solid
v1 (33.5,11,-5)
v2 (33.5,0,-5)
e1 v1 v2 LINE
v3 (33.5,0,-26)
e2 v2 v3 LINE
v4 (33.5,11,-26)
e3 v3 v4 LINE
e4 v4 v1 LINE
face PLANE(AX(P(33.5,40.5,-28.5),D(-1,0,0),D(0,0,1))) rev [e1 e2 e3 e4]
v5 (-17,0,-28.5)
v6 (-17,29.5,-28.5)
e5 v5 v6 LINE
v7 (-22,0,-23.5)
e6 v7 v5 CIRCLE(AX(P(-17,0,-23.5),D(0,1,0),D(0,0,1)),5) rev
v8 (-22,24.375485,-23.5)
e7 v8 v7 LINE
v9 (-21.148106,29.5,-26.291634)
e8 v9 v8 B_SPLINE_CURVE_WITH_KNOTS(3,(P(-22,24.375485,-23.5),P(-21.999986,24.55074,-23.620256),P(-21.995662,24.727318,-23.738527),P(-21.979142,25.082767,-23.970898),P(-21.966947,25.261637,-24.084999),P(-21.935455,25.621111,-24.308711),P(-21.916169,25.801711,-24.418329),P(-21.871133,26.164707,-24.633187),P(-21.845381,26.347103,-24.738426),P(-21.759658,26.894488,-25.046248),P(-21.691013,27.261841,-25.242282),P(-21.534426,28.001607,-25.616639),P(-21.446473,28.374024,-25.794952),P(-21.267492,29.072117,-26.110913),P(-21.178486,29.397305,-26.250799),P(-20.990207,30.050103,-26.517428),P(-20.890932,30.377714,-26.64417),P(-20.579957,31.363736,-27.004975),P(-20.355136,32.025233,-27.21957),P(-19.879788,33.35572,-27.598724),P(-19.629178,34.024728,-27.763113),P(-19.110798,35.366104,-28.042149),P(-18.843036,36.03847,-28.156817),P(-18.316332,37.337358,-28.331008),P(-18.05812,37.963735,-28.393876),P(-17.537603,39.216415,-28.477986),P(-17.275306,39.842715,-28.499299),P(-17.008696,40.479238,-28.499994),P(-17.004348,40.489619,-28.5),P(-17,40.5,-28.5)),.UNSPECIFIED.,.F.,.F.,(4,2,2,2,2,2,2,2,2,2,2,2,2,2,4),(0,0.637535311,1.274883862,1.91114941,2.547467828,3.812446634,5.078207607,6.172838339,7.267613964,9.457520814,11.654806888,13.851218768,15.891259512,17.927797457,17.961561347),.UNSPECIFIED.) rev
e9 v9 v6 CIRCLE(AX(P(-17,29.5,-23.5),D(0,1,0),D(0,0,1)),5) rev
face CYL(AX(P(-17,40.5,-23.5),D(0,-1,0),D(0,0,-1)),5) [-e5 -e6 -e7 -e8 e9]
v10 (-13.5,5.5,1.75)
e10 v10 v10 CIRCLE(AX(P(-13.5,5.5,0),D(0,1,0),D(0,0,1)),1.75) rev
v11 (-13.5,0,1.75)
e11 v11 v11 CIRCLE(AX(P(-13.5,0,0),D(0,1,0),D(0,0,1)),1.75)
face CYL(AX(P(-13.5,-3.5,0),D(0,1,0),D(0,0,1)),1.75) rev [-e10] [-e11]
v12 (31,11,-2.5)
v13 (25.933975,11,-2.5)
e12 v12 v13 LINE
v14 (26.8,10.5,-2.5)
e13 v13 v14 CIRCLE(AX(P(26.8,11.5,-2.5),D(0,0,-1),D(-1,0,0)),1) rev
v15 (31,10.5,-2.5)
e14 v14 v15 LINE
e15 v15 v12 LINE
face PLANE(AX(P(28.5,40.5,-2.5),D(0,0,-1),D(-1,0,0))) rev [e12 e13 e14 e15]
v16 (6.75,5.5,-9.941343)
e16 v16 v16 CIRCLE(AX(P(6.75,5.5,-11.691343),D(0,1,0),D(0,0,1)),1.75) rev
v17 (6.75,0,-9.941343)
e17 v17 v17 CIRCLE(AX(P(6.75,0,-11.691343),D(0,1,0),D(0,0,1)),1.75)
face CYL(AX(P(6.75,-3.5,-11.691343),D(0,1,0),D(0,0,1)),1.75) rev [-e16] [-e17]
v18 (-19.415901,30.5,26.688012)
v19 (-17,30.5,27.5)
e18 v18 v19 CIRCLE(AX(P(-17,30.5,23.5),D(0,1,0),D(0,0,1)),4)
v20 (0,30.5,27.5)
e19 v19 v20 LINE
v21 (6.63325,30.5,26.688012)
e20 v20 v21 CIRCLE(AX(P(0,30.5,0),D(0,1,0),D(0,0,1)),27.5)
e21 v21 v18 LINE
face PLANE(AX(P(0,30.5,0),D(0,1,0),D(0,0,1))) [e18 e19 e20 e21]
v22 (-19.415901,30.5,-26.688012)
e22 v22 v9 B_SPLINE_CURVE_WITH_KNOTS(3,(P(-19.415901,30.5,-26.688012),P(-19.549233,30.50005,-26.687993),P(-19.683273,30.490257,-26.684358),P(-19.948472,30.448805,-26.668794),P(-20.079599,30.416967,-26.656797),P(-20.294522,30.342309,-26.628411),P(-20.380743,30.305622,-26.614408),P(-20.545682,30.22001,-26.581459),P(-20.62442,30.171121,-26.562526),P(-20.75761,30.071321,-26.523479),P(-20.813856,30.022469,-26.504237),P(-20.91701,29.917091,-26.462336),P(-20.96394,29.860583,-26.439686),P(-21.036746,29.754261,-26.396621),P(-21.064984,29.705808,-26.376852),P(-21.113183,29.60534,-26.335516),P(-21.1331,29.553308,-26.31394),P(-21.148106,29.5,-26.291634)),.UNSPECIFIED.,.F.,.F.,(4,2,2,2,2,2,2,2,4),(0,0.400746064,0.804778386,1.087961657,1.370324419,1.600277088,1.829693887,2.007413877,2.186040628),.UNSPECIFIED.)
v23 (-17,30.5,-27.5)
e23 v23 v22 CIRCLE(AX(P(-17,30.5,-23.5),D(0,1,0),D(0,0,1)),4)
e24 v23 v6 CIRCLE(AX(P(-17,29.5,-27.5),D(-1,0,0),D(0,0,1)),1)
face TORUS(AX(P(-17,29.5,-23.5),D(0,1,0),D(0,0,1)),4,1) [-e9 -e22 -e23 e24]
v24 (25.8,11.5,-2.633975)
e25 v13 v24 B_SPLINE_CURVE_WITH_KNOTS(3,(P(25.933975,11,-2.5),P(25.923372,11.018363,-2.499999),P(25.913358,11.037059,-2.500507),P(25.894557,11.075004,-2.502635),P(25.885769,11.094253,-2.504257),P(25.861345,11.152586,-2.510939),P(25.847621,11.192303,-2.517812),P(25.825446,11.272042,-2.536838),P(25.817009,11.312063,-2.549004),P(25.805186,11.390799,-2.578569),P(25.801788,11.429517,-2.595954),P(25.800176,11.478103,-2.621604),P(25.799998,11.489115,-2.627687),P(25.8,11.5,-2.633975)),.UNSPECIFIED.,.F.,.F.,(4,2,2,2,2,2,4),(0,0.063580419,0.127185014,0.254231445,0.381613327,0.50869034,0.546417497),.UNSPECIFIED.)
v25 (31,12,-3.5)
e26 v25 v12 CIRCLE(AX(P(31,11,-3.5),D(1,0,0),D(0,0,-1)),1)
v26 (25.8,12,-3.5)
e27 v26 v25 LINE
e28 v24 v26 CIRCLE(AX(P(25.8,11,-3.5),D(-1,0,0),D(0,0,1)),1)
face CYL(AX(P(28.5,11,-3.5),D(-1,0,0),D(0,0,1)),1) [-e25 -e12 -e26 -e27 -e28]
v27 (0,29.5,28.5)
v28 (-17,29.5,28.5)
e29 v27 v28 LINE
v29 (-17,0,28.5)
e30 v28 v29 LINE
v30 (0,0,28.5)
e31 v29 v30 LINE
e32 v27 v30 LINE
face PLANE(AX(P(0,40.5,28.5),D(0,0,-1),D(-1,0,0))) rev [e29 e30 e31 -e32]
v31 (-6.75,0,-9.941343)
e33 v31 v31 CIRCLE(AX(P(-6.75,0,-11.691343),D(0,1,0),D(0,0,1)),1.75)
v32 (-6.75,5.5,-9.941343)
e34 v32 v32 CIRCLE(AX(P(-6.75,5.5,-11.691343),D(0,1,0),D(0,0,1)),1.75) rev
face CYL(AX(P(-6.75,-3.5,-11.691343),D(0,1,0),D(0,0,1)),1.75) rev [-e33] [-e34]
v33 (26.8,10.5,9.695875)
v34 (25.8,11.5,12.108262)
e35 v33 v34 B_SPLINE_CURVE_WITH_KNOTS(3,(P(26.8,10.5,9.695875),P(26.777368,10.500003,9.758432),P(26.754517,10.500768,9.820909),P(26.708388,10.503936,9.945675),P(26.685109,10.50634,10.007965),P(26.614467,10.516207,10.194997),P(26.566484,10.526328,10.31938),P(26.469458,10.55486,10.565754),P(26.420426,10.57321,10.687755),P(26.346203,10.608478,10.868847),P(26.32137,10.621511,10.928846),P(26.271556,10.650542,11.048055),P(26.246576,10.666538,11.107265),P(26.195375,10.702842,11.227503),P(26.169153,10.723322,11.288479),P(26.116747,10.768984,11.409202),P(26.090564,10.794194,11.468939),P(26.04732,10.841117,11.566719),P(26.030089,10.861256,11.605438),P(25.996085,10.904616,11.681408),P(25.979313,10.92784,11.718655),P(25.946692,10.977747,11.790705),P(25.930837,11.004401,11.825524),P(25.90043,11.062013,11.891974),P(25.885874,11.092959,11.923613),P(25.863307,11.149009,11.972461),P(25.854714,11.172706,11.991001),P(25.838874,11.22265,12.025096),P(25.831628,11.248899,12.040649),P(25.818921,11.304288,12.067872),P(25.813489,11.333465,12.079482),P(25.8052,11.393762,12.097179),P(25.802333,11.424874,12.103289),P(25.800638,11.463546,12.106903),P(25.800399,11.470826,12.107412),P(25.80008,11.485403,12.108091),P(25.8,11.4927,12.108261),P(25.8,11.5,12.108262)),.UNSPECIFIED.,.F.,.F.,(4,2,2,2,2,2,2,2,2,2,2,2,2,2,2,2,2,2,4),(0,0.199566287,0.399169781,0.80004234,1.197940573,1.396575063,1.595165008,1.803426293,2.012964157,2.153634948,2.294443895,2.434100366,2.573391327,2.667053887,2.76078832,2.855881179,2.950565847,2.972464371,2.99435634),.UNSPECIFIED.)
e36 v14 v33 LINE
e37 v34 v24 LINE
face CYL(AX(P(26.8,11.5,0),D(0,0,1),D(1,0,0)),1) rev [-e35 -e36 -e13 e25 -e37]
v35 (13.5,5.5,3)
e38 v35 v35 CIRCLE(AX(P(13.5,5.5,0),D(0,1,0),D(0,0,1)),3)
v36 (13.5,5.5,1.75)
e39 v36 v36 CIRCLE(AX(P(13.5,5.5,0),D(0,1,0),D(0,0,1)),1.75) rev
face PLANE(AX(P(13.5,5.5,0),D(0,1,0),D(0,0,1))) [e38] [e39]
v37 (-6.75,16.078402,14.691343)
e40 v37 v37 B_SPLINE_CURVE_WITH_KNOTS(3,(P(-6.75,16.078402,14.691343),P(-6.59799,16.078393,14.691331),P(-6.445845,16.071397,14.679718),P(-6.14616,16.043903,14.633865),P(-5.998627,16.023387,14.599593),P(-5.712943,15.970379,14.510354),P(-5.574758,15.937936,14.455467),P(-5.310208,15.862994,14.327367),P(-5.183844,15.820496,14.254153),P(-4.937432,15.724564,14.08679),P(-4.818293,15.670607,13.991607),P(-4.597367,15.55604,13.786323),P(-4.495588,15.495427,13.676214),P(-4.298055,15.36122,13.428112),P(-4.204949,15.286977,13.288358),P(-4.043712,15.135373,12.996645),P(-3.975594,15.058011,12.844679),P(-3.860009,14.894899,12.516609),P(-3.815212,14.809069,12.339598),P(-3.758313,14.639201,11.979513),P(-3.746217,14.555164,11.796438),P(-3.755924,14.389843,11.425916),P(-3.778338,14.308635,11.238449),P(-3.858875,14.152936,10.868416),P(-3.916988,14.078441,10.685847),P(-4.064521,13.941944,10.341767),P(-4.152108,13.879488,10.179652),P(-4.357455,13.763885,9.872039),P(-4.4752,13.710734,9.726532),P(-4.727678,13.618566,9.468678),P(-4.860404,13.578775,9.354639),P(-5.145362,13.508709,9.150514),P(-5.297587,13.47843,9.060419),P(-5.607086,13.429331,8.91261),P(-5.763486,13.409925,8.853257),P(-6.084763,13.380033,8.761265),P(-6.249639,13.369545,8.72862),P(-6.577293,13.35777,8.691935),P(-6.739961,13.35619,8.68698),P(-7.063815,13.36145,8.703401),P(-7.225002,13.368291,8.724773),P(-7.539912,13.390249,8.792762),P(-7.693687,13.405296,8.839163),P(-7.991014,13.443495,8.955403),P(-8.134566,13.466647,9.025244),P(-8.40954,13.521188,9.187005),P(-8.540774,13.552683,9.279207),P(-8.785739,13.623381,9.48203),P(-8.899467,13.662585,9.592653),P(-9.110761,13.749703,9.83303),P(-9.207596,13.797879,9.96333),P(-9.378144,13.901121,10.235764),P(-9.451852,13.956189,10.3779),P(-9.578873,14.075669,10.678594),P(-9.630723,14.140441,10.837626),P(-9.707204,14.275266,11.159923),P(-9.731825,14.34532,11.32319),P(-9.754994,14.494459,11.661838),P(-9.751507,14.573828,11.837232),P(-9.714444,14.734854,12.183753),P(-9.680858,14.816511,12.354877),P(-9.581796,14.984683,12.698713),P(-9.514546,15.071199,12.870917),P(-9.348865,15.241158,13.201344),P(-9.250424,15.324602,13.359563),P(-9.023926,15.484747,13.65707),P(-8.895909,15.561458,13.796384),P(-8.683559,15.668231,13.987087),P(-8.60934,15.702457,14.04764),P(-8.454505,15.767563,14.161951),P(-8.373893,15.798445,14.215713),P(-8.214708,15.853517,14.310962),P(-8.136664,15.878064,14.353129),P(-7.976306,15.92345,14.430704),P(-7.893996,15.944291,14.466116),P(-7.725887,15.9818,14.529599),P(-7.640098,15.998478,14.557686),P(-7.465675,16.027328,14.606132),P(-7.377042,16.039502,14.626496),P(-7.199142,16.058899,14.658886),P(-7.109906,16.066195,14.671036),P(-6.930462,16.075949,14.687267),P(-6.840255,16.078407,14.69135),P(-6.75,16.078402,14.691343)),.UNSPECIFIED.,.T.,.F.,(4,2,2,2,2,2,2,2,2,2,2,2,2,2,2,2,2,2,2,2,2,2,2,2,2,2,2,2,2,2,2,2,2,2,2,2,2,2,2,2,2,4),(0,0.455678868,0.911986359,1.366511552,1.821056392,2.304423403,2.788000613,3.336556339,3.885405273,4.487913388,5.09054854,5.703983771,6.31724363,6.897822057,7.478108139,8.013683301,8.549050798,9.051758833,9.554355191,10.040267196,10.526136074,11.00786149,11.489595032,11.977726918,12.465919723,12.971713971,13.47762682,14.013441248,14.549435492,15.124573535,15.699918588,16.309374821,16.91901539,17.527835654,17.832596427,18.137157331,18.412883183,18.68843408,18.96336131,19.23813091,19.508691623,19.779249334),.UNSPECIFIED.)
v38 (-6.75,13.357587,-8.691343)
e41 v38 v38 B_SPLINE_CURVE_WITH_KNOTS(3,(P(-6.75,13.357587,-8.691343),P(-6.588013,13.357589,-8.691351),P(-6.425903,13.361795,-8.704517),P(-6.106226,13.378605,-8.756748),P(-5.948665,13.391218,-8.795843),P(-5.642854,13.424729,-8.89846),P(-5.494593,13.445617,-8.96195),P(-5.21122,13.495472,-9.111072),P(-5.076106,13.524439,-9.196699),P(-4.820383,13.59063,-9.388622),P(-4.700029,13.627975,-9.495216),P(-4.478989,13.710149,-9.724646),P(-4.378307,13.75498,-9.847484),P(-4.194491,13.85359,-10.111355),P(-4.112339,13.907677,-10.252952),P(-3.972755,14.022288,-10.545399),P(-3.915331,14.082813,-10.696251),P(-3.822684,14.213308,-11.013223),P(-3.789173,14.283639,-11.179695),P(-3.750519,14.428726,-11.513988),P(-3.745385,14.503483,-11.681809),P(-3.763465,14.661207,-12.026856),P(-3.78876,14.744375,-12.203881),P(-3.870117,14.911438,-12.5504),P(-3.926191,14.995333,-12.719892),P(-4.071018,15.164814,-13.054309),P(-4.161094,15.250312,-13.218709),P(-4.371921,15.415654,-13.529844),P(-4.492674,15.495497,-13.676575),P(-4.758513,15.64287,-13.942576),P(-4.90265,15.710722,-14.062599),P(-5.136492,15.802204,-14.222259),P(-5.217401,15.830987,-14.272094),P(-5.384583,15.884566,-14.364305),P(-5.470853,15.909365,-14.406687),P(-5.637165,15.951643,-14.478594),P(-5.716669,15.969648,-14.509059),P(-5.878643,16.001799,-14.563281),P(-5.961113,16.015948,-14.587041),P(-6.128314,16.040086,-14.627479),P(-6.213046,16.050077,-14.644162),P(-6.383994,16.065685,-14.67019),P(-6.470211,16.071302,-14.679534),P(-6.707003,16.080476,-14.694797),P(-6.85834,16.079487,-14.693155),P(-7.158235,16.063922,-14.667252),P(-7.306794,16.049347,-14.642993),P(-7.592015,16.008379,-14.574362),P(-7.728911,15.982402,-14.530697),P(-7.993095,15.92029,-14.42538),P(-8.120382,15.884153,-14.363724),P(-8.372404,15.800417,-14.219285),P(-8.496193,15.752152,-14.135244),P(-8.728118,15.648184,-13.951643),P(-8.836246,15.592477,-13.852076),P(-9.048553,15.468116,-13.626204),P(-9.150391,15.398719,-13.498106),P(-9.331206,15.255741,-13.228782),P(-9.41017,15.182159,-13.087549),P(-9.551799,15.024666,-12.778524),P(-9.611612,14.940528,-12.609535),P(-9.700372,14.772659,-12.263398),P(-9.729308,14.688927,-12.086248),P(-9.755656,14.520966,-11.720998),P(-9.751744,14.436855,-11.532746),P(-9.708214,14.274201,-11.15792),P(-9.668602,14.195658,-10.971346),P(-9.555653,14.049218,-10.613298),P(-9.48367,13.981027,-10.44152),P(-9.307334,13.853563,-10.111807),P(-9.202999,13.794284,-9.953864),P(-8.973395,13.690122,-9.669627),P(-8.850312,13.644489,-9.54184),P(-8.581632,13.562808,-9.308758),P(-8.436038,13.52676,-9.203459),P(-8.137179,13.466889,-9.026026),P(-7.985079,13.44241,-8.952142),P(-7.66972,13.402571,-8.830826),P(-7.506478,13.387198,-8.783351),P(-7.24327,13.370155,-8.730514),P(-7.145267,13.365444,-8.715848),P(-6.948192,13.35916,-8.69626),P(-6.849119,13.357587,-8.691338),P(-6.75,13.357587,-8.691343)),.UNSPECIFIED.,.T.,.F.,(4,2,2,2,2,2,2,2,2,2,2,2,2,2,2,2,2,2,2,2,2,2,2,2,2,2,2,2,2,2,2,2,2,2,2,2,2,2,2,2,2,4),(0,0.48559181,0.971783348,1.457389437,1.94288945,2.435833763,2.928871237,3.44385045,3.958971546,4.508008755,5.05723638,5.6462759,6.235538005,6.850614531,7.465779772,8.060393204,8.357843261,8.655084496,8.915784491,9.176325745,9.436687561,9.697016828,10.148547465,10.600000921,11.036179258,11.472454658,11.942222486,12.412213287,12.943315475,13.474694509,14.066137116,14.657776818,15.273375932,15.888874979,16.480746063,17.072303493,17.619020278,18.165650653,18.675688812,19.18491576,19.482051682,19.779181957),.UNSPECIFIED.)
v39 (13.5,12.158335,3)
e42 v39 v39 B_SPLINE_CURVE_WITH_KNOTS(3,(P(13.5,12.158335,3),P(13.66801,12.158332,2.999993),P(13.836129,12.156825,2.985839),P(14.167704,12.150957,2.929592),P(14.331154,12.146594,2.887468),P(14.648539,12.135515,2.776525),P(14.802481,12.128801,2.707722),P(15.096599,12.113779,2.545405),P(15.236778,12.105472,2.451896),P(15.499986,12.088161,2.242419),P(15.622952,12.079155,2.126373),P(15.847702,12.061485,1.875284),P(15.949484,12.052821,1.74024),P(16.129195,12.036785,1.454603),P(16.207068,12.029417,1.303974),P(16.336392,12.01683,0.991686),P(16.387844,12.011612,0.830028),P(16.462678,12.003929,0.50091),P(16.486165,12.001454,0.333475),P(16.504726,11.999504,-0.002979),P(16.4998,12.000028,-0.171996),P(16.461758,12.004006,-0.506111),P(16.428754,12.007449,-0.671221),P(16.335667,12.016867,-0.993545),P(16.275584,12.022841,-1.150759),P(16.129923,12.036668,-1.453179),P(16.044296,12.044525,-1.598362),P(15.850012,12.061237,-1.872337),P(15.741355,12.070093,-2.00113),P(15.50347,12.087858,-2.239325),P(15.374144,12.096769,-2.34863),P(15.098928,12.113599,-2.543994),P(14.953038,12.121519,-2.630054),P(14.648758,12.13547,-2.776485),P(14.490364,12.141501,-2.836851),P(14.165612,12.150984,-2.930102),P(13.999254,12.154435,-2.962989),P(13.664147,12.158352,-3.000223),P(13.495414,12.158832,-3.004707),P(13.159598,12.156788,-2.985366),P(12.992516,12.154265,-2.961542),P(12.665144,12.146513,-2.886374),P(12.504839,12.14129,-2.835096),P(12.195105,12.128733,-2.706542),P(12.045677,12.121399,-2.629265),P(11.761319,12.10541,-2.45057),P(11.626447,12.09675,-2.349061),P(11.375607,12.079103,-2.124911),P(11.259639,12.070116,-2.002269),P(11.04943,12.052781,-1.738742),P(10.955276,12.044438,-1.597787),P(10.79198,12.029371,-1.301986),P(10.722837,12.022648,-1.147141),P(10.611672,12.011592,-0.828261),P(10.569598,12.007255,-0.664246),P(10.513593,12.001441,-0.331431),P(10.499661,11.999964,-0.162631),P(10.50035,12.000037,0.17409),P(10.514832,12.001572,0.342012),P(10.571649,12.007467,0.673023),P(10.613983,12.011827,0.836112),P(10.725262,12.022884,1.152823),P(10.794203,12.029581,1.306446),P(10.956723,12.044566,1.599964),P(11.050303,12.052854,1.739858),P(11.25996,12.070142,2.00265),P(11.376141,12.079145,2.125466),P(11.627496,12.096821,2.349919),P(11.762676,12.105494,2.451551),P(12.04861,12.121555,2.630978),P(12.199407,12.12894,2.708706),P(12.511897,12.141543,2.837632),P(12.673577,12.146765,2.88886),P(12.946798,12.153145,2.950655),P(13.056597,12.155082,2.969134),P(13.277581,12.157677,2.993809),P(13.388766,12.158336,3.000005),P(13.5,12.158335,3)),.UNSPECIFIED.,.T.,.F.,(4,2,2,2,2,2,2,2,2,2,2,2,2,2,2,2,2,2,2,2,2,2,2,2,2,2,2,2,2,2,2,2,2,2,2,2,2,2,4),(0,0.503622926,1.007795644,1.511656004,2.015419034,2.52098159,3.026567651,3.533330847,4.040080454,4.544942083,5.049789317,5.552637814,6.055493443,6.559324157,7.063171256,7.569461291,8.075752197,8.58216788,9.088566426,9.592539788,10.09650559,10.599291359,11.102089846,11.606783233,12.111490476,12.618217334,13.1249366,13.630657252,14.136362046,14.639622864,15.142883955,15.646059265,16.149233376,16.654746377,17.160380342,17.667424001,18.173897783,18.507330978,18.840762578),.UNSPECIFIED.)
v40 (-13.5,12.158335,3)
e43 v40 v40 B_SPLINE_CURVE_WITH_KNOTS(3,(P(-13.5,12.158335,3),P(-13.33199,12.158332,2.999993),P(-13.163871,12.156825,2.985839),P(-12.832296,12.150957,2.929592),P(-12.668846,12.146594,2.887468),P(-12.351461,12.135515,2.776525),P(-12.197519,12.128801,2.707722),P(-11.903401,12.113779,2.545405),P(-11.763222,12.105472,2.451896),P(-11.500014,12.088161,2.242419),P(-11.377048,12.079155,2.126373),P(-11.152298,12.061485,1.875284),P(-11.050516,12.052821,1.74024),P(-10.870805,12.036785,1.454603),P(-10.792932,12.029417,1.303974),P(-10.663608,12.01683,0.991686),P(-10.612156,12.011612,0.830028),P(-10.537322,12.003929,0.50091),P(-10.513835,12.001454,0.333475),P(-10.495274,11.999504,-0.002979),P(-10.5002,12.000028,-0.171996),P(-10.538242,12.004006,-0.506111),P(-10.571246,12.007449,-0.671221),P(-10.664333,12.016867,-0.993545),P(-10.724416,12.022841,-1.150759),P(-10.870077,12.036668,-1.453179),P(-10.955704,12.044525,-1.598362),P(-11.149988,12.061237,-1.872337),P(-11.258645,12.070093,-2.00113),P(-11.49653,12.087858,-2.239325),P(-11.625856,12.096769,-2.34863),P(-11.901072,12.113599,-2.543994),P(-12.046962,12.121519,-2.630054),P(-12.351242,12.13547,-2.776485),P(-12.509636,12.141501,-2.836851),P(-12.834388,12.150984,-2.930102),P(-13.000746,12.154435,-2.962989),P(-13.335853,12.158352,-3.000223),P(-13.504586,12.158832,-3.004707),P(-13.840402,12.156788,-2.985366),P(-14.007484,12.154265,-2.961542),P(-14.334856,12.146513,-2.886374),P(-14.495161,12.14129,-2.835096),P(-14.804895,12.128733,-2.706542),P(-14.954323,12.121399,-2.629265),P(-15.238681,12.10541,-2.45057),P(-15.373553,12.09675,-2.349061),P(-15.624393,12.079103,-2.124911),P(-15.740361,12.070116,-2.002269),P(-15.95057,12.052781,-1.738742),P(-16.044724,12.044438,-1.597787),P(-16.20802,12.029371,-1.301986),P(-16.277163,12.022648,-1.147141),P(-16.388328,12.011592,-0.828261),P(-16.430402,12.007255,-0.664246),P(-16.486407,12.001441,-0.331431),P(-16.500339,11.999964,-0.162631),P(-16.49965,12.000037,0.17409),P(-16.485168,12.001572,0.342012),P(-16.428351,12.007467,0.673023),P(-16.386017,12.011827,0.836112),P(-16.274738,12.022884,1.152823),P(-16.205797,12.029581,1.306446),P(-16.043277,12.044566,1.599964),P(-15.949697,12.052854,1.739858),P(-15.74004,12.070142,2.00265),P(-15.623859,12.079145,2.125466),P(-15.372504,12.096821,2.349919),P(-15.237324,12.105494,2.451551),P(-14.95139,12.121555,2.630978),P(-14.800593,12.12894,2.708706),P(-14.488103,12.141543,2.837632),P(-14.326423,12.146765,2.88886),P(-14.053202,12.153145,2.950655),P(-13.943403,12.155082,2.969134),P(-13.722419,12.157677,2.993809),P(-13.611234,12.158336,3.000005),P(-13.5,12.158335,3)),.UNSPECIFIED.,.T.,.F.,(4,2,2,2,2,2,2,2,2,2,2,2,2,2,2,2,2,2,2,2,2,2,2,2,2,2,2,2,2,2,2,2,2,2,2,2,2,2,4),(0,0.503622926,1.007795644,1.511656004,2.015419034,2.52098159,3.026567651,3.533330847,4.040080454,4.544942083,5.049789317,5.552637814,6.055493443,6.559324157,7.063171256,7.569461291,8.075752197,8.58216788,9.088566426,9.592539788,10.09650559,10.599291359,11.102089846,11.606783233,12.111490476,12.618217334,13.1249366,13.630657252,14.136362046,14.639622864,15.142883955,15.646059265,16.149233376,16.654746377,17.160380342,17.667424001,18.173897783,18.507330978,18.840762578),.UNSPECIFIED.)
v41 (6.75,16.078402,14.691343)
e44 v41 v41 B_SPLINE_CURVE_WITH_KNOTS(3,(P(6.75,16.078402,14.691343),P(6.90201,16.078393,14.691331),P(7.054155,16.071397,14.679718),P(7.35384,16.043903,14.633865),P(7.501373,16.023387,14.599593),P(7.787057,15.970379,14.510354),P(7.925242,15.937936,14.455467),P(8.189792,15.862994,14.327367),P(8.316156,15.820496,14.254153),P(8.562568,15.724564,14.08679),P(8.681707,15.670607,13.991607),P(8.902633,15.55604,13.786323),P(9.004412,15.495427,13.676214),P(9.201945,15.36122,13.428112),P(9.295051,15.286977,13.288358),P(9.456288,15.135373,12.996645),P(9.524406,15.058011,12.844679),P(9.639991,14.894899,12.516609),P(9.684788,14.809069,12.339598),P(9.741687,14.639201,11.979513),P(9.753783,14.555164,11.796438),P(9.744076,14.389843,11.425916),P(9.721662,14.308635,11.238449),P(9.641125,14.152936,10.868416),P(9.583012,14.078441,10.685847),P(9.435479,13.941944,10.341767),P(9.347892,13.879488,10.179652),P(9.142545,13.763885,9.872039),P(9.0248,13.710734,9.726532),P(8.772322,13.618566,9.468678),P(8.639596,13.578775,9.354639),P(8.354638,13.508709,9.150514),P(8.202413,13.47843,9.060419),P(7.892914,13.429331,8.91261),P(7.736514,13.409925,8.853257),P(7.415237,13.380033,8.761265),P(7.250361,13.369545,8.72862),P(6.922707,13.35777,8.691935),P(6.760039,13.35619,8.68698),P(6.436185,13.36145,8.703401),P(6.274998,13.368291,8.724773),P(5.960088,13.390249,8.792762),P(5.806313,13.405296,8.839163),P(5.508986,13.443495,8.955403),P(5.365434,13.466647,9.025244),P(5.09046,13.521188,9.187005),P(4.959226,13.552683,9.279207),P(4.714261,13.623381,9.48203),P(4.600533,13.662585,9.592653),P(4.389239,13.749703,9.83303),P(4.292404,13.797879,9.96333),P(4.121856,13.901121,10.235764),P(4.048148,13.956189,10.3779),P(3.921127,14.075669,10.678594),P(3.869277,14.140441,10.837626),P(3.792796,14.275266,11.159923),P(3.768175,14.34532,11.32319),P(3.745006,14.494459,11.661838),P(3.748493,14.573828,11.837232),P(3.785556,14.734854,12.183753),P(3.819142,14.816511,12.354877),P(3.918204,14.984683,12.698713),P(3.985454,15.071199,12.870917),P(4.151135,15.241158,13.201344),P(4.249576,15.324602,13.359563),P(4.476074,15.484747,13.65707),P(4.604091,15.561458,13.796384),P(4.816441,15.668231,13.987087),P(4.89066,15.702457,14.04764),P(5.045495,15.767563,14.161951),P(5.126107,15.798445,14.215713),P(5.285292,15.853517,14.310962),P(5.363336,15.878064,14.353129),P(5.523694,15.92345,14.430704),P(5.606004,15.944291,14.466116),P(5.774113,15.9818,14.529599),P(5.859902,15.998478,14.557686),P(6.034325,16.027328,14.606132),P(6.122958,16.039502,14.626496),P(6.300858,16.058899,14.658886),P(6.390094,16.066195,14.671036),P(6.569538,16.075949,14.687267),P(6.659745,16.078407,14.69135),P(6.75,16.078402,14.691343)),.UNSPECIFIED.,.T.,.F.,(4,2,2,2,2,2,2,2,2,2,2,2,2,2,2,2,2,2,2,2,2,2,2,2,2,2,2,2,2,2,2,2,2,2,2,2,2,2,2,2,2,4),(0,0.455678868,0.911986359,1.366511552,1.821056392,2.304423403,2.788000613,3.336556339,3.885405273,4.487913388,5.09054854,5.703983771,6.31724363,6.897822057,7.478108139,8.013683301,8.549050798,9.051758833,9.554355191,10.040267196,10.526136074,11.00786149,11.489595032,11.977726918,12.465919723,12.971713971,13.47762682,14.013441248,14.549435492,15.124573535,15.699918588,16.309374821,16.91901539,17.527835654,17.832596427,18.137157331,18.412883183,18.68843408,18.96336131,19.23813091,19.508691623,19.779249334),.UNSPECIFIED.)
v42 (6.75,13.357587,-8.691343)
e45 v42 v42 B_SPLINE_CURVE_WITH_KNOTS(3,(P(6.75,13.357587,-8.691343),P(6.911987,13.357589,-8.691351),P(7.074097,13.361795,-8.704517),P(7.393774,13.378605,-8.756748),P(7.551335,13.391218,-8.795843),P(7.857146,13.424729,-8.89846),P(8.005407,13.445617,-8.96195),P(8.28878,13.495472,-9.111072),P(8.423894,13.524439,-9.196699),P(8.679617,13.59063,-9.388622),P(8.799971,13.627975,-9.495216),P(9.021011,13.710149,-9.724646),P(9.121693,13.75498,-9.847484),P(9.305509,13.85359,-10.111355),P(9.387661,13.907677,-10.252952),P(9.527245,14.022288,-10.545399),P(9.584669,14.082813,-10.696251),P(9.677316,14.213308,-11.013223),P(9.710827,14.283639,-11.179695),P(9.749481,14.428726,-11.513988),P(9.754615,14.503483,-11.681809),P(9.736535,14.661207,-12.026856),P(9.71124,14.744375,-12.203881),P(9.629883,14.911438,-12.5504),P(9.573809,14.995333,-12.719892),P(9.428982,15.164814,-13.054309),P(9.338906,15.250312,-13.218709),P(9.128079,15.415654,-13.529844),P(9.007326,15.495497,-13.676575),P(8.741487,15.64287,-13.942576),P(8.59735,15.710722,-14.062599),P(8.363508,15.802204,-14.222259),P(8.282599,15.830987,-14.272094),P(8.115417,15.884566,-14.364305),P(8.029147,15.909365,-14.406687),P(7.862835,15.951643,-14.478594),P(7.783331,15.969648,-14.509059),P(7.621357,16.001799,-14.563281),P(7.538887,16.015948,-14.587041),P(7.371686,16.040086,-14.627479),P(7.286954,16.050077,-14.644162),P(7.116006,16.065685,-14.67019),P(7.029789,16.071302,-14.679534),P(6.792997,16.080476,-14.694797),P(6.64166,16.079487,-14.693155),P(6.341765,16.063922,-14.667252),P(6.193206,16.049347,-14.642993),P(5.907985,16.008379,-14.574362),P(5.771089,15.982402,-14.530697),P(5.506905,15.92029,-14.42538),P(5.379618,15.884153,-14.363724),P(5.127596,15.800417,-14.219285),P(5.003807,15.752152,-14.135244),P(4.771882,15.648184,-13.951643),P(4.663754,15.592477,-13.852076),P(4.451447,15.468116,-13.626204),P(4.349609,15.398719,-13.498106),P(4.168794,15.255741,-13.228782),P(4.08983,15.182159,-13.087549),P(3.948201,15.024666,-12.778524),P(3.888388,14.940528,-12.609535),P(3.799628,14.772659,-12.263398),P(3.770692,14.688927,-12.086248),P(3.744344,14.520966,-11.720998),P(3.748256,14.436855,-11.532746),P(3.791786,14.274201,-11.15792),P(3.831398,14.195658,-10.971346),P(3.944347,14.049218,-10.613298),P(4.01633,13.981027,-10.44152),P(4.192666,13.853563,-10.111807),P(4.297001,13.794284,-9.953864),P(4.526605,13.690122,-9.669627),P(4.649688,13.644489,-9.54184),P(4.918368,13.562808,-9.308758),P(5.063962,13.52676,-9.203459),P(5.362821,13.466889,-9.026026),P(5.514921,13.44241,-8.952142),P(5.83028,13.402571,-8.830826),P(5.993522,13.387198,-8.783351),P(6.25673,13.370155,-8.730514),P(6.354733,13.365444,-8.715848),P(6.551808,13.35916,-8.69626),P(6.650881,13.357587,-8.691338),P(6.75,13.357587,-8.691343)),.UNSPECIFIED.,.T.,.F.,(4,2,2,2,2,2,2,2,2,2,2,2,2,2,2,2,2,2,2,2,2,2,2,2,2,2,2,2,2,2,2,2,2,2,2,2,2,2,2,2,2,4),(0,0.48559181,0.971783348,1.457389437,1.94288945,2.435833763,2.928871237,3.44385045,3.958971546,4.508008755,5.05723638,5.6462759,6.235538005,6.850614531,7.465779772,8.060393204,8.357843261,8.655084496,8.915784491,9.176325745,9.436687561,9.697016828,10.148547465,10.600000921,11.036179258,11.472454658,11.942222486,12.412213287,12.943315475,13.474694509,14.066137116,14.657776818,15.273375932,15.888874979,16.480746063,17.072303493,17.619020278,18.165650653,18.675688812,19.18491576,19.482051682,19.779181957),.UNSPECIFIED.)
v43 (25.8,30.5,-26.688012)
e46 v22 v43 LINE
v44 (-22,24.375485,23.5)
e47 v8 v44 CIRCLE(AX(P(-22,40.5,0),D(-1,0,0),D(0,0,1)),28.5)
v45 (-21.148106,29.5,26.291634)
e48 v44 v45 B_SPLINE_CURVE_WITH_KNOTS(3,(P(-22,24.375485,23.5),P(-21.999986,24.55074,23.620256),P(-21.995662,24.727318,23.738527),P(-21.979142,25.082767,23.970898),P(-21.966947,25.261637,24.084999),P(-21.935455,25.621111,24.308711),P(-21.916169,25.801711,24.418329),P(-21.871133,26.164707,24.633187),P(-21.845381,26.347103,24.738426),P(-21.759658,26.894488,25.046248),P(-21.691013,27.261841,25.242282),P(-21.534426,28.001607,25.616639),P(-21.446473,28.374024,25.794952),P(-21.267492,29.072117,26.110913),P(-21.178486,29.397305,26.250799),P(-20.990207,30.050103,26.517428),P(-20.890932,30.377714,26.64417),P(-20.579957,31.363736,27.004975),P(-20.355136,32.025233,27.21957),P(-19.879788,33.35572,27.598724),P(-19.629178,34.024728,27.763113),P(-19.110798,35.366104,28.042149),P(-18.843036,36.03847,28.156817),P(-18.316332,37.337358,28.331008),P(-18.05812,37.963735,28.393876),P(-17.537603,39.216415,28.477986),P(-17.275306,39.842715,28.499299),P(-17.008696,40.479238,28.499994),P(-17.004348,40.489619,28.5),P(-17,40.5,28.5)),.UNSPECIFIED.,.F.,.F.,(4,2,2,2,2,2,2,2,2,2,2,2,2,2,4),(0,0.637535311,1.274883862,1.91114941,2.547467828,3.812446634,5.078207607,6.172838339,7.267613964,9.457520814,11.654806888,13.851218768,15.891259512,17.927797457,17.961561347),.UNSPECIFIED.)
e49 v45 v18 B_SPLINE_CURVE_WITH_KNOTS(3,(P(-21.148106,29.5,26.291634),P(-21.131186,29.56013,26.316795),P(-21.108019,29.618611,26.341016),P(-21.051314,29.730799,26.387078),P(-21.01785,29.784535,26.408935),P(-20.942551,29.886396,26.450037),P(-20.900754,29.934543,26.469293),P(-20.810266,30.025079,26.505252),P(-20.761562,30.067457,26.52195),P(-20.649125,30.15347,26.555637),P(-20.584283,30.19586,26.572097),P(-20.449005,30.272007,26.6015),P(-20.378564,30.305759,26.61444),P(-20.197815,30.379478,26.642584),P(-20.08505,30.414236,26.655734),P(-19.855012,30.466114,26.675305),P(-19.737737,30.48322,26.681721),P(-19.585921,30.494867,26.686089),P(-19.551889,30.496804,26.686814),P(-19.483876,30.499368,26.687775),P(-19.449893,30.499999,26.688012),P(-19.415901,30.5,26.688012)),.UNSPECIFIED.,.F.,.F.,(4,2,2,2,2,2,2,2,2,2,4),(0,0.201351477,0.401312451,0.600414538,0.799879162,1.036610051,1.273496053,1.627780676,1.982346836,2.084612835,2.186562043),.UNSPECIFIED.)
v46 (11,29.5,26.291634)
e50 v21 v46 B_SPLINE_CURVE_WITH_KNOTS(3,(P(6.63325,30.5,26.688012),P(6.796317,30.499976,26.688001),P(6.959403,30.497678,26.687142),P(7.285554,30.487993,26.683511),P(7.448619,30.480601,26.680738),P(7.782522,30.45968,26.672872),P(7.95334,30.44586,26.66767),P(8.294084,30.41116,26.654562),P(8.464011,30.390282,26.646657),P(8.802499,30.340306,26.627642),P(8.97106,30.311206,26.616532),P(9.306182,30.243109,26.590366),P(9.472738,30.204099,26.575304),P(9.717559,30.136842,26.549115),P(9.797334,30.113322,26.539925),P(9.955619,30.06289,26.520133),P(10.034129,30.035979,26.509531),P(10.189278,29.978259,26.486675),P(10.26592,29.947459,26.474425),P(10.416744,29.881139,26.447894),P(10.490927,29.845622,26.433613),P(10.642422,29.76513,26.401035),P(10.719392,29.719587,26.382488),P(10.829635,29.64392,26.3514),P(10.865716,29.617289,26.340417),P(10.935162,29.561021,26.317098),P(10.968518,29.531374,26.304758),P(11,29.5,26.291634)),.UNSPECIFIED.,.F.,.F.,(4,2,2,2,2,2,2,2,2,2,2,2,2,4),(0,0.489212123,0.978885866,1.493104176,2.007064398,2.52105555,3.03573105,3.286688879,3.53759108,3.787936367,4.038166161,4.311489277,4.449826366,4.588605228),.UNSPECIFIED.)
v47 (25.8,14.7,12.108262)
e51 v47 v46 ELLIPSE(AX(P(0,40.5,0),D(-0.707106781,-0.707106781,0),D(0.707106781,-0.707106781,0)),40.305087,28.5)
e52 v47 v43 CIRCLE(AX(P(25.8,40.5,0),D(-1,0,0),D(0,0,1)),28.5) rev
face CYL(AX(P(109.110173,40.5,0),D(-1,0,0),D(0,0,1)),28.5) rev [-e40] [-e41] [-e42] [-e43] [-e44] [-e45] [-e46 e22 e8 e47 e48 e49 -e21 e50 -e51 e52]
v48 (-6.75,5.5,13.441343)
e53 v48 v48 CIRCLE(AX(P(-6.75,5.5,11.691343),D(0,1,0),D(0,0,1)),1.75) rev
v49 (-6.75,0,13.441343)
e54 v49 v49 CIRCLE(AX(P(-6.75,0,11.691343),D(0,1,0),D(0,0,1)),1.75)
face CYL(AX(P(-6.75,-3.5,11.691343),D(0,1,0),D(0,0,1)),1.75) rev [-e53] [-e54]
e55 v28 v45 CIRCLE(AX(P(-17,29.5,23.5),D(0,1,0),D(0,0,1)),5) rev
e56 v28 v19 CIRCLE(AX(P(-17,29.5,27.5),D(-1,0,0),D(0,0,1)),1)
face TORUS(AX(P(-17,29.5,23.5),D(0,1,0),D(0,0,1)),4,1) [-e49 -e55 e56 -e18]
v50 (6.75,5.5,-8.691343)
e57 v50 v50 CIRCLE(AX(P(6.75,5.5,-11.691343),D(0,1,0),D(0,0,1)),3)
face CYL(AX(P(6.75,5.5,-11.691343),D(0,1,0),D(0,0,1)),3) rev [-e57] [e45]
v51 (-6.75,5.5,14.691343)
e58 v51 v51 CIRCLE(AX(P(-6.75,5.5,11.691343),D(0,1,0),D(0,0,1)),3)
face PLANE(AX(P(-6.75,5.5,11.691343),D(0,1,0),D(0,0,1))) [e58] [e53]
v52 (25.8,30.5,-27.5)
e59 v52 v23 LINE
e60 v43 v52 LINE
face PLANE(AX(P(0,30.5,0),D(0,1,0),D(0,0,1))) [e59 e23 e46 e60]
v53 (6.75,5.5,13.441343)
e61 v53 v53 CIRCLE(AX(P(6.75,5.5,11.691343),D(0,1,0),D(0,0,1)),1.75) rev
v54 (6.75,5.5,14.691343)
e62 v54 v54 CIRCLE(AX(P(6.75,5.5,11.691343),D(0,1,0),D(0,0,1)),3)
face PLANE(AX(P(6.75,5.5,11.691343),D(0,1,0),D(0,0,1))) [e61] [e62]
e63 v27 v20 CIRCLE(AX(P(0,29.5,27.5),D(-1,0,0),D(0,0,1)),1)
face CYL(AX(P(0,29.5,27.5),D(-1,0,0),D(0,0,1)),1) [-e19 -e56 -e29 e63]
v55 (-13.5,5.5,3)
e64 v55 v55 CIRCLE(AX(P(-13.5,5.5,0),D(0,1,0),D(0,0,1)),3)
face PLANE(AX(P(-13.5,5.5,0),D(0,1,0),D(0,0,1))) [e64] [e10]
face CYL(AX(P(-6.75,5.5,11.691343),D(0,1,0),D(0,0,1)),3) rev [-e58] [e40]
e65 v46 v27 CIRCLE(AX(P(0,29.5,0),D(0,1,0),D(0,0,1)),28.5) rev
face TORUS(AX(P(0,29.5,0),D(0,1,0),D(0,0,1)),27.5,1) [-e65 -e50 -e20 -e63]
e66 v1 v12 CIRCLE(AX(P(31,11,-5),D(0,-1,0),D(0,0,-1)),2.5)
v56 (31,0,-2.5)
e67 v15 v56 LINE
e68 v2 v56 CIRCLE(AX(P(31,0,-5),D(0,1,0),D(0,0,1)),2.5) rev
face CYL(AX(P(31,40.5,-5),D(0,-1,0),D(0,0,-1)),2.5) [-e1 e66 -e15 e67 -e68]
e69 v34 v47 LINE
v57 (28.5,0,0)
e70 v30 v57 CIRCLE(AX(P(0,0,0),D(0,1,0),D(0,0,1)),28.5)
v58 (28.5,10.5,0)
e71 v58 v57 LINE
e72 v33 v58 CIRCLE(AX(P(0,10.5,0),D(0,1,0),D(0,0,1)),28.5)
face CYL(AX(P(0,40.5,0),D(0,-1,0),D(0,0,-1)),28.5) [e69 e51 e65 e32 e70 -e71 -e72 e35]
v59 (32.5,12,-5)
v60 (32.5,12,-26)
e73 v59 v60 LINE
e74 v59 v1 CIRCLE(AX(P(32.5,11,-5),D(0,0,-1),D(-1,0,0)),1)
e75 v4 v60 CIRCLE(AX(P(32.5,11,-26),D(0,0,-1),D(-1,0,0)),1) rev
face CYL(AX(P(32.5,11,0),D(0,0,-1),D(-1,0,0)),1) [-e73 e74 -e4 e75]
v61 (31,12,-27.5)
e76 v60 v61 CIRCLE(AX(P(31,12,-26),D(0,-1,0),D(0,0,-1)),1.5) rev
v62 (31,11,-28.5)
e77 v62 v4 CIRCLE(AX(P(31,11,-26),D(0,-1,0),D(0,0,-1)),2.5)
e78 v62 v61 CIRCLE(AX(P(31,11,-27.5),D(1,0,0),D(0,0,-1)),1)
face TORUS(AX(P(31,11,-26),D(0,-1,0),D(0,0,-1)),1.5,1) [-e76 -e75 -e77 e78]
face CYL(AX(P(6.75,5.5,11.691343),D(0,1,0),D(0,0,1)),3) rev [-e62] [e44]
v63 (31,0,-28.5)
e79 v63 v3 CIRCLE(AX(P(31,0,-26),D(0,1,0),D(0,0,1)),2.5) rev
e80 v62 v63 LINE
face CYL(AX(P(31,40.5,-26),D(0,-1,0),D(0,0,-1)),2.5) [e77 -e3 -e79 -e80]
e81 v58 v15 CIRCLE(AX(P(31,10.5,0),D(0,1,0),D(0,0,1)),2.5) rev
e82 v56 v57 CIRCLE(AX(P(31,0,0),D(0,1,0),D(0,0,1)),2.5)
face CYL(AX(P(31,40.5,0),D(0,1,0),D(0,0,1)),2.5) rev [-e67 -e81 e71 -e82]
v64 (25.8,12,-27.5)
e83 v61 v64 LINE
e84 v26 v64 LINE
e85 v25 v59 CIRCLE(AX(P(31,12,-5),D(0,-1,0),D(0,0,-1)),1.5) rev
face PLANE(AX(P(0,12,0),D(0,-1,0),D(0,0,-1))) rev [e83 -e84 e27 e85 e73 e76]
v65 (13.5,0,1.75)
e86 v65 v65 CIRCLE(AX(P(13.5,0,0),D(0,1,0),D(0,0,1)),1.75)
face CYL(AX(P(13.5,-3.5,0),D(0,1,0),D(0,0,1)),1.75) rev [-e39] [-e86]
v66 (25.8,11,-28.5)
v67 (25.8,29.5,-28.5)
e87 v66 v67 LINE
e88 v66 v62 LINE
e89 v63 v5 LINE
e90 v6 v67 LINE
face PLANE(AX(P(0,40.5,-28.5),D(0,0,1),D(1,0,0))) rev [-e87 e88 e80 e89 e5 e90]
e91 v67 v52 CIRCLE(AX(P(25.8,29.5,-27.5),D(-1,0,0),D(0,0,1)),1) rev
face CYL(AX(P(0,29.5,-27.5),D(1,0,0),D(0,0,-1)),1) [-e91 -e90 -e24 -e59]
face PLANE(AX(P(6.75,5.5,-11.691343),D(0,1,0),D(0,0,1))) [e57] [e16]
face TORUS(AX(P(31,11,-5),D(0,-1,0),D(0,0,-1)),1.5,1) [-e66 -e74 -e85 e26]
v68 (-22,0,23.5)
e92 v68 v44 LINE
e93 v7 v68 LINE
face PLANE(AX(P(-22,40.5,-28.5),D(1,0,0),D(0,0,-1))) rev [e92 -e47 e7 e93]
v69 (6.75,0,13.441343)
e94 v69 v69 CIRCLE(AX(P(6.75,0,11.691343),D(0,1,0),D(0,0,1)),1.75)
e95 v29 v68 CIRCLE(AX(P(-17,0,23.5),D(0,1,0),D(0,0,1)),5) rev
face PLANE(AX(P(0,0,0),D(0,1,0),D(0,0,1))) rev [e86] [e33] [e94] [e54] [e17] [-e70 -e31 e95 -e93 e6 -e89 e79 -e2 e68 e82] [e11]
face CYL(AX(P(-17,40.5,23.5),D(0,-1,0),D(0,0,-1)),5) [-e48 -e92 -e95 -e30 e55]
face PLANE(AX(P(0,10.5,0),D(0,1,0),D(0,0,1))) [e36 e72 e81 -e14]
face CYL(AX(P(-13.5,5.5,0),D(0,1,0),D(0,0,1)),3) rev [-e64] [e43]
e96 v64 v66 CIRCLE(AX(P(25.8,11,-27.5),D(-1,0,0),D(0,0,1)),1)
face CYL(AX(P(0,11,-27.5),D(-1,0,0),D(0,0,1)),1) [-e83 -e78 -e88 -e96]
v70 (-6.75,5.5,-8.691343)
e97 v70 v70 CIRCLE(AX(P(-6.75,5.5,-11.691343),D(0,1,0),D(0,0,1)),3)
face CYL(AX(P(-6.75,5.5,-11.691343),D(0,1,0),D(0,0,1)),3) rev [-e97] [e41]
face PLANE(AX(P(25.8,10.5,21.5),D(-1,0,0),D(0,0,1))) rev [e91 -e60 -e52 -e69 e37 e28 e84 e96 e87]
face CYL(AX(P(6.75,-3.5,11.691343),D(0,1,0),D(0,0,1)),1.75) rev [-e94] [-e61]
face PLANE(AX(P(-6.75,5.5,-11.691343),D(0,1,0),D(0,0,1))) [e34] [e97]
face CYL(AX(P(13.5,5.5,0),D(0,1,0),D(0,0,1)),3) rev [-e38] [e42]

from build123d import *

# Parameters (mm, degrees)
EXTRUDE_1_DEPTH     = 40.5
SKETCH_2_R          = 1.75
CUT_EXTRUDE_1_DEPTH = 44
FILLET_6_R          = 5
SKETCH_5_R          = 3
CUT_EXTRUDE_2_DEPTH = 35
SKETCH_6_R          = 7.5
CUT_EXTRUDE_3_DEPTH = 10
CUT_EXTRUDE_4_REACH = 76.382
SKETCH_8_R          = 28.5
SKETCH_4_W          = 7.7
SKETCH_4_H          = 50
CUT_EXTRUDE_5_DEPTH = 30
SKETCH_9_W          = 74.837423064
SKETCH_9_H          = 60.925338007
CUT_EXTRUDE_6_DEPTH = 10
SKETCH_11_W         = 7.7
SKETCH_11_H         = 26
EXTRUDE_2_DEPTH     = 1.5
FILLET_12_R         = 2.5
FILLET_13_R         = 1
FILLET_14_R         = 1
FILLET_15_R         = 2.5
FILLET_START        = 25.8
FILLET_16_DEPTH     = 8.2
FILLET_16_2_ANGLE   = 90
FILLET_17_R         = 1


with BuildPart() as part:
    # 草图1 → 凸台-拉伸1 (new body)
    with BuildSketch(Plane(origin=(0, 0, 0), x_dir=(1, 0, 0), z_dir=(0, 1, 0))):
        with BuildLine():
            Line((0, 28.5), (-22, 28.5))
            Line((-22, 28.5), (-22, -28.5))
            Line((-22, -28.5), (0, -28.5))
            ThreePointArc((0, -28.5), (20.152543264, -20.152543264), (28.5, 0))
            Line((28.5, 0), (28.5, 2.5))
            Line((28.5, 2.5), (33.5, 2.5))
            Line((33.5, 2.5), (33.5, 28.5))
            Line((33.5, 28.5), (0, 28.5))
        make_face()
    extrude(amount=EXTRUDE_1_DEPTH)

    # 草图2 → 切除-拉伸1 (cut)
    with BuildSketch(Plane(origin=(0, 40.5, 0), x_dir=(1, 0, 0), z_dir=(0, 1, 0))):
        with Locations(Location((-13.5, 0, 0), (0, 0, 270))):
            Circle(SKETCH_2_R)
        with Locations(Location((-6.75, 11.691342951, 0), (0, 0, 270))):
            Circle(SKETCH_2_R)
        with Locations(Location((6.75, 11.691342951, 0), (0, 0, 270))):
            Circle(SKETCH_2_R)
        with Locations(Location((13.5, 0, 0), (0, 0, 270))):
            Circle(SKETCH_2_R)
        with Locations(Location((6.75, -11.691342951, 0), (0, 0, 270))):
            Circle(SKETCH_2_R)
        with Locations(Location((-6.75, -11.691342951, 0), (0, 0, 270))):
            Circle(SKETCH_2_R)
    extrude(amount=-CUT_EXTRUDE_1_DEPTH, mode=Mode.SUBTRACT)

    # 圆角6
    fillet_6_edges = [part.edges().sort_by_distance(p)[0] for p in [
        (-22, 20.25, 28.5),
        (-22, 20.25, -28.5),
    ]]
    fillet(fillet_6_edges, radius=FILLET_6_R)

    # 草图5 → 切除-拉伸2 (cut)
    with BuildSketch(Plane(origin=(0, 40.5, 0), x_dir=(1, 0, 0), z_dir=(0, 1, 0))):
        with Locations(Location((-13.5, 0, 0), (0, 0, 270))):
            Circle(SKETCH_5_R)
        with Locations(Location((-6.75, 11.691342951, 0), (0, 0, 270))):
            Circle(SKETCH_5_R)
        with Locations(Location((6.75, 11.691342951, 0), (0, 0, 270))):
            Circle(SKETCH_5_R)
        with Locations(Location((13.5, 0, 0), (0, 0, 270))):
            Circle(SKETCH_5_R)
        with Locations(Location((6.75, -11.691342951, 0), (0, 0, 270))):
            Circle(SKETCH_5_R)
        with Locations(Location((-6.75, -11.691342951, 0), (0, 0, 270))):
            Circle(SKETCH_5_R)
    extrude(amount=-CUT_EXTRUDE_2_DEPTH, mode=Mode.SUBTRACT)

    # 草图6 → 切除-拉伸3 (cut)
    with BuildSketch(Plane(origin=(0, 40.5, 0), x_dir=(1, 0, 0), z_dir=(0, 1, 0))):
        with Locations(Location((0, 0, 0), (0, 0, 270))):
            Circle(SKETCH_6_R)
    extrude(amount=-CUT_EXTRUDE_3_DEPTH, mode=Mode.SUBTRACT)

    # 切除-拉伸4: up to this face of the body (flat: up to its plane)
    cut_extrude_4_end = Plane(part.part.faces().sort_by_distance((28.5, 20.25, -1.25))[0])
    # 草图8 → 切除-拉伸4 (cut, up to the picked face)
    with BuildSketch(Plane.ZY.offset(22), mode=Mode.PRIVATE) as cut_extrude_4_sk1:
        with Locations((0, 40.5)):
            Circle(SKETCH_8_R)
    cut_extrude_4_tool1 = split(extrude(cut_extrude_4_sk1.sketch, amount=-CUT_EXTRUDE_4_REACH, mode=Mode.PRIVATE), bisect_by=cut_extrude_4_end, keep=Keep.BOTH, mode=Mode.PRIVATE)
    add(cut_extrude_4_tool1.solids().sort_by(Axis((-22, 40.5, 0), (1, 0, 0)))[0], mode=Mode.SUBTRACT)

    # 草图4 → 切除-拉伸5 (cut)
    with BuildSketch(Plane(origin=(0, 40.5, 0), x_dir=(1, 0, 0), z_dir=(0, 1, 0))):
        with Locations((29.65, 3.5)):
            Rectangle(SKETCH_4_W, SKETCH_4_H)
    extrude(amount=-CUT_EXTRUDE_5_DEPTH, mode=Mode.SUBTRACT)

    # 草图9 → 切除-拉伸6 (cut)
    with BuildSketch(Plane(origin=(0, 40.5, 0), x_dir=(1, 0, 0), z_dir=(0, 1, 0))):
        with Locations((5.520272929, 0.012240625)):
            Rectangle(SKETCH_9_W, SKETCH_9_H)
    extrude(amount=-CUT_EXTRUDE_6_DEPTH, mode=Mode.SUBTRACT)

    # 草图11 → 凸台-拉伸2 (add)
    with BuildSketch(Plane(origin=(0, 10.5, 0), x_dir=(1, 0, 0), z_dir=(0, 1, 0))):
        with Locations((29.65, 15.5)):
            Rectangle(SKETCH_11_W, SKETCH_11_H)
    extrude(amount=EXTRUDE_2_DEPTH)

    # 圆角12
    fillet_12_edges = [part.edges().sort_by_distance(p)[0] for p in [
        (33.5, 6, -2.5),
        (28.5, 5.25, -2.5),
    ]]
    fillet(fillet_12_edges, radius=FILLET_12_R - 0.0001)  # a hair under: the kernel refuses the full size

    # 圆角13
    fillet_13_edges = [part.edges().sort_by_distance(p)[0] for p in [
        (25.8, 10.5, 4.804130821),
    ]]
    fillet(fillet_13_edges, radius=FILLET_13_R)

    # 圆角14
    fillet_14_edges = [part.edges().sort_by_distance(p)[0] for p in [
        (33.5, 12, -16.74995),
        (32.767796242, 12, -3.232203758),
        (28.40005, 12, -2.5),
    ]]
    fillet(fillet_14_edges, radius=FILLET_14_R)

    # 圆角15
    # the kernel refuses this fillet: 2.5 mm, written as the material it takes off along each edge
    with BuildSketch(Plane(origin=(33.5, 17.25, -28.5), x_dir=(-1, 0, 0), z_dir=(0, -1, 0))) as fillet_15_piece_1:
        with BuildLine():
            CenterArc((FILLET_15_R, -FILLET_15_R), FILLET_15_R, 90, 90)
            Line((0, -FILLET_15_R), (0, 0))
            Line((0, 0), (FILLET_15_R, 0))
        make_face()
    extrude(amount=23.5, mode=Mode.SUBTRACT)

    # 圆角16: read off the stored shape, not the designer's step
    # 圆角16 outline → 圆角16 (cut)
    with BuildSketch(Plane.YZ.offset(FILLET_START)):
        with BuildLine():
            Line((12, -28.5), (12, -27.5))
            ThreePointArc((12, -27.5), (11.707106781, -28.207106781), (11, -28.5))
            Line((11, -28.5), (12, -28.5))
        make_face()
    extrude(amount=FILLET_16_DEPTH, mode=Mode.SUBTRACT)

    # Fillet 16 2 outline → Fillet 16 2 (revolve, cut)
    with BuildSketch(Plane(origin=(31, 0, -26), x_dir=(1, 0, 0), z_dir=(0, 0, 1))):
        with BuildLine():
            Line((2.5, 12), (1.5, 12))
            ThreePointArc((1.5, 12), (2.207106781, 11.707106781), (2.5, 11))
            Line((2.5, 11), (2.5, 12))
        make_face()
    revolve(axis=Axis((31, 0, -26), (0, 1, 0)), revolution_arc=FILLET_16_2_ANGLE, mode=Mode.SUBTRACT)

    # 圆角17
    fillet_17_edges = [part.edges().sort_by_distance(p)[0] for p in [
        (-19.128372458, 30.5, -28.024381801),
        (4.4, 30.5, -28.5),
        (-19.128372458, 30.5, 28.024381801),
        (5.081419572, 30.5, 28.043344578),
        (-8.5, 30.5, 28.5),
    ]]
    fillet(fillet_17_edges, radius=FILLET_17_R)


solid = part.part
